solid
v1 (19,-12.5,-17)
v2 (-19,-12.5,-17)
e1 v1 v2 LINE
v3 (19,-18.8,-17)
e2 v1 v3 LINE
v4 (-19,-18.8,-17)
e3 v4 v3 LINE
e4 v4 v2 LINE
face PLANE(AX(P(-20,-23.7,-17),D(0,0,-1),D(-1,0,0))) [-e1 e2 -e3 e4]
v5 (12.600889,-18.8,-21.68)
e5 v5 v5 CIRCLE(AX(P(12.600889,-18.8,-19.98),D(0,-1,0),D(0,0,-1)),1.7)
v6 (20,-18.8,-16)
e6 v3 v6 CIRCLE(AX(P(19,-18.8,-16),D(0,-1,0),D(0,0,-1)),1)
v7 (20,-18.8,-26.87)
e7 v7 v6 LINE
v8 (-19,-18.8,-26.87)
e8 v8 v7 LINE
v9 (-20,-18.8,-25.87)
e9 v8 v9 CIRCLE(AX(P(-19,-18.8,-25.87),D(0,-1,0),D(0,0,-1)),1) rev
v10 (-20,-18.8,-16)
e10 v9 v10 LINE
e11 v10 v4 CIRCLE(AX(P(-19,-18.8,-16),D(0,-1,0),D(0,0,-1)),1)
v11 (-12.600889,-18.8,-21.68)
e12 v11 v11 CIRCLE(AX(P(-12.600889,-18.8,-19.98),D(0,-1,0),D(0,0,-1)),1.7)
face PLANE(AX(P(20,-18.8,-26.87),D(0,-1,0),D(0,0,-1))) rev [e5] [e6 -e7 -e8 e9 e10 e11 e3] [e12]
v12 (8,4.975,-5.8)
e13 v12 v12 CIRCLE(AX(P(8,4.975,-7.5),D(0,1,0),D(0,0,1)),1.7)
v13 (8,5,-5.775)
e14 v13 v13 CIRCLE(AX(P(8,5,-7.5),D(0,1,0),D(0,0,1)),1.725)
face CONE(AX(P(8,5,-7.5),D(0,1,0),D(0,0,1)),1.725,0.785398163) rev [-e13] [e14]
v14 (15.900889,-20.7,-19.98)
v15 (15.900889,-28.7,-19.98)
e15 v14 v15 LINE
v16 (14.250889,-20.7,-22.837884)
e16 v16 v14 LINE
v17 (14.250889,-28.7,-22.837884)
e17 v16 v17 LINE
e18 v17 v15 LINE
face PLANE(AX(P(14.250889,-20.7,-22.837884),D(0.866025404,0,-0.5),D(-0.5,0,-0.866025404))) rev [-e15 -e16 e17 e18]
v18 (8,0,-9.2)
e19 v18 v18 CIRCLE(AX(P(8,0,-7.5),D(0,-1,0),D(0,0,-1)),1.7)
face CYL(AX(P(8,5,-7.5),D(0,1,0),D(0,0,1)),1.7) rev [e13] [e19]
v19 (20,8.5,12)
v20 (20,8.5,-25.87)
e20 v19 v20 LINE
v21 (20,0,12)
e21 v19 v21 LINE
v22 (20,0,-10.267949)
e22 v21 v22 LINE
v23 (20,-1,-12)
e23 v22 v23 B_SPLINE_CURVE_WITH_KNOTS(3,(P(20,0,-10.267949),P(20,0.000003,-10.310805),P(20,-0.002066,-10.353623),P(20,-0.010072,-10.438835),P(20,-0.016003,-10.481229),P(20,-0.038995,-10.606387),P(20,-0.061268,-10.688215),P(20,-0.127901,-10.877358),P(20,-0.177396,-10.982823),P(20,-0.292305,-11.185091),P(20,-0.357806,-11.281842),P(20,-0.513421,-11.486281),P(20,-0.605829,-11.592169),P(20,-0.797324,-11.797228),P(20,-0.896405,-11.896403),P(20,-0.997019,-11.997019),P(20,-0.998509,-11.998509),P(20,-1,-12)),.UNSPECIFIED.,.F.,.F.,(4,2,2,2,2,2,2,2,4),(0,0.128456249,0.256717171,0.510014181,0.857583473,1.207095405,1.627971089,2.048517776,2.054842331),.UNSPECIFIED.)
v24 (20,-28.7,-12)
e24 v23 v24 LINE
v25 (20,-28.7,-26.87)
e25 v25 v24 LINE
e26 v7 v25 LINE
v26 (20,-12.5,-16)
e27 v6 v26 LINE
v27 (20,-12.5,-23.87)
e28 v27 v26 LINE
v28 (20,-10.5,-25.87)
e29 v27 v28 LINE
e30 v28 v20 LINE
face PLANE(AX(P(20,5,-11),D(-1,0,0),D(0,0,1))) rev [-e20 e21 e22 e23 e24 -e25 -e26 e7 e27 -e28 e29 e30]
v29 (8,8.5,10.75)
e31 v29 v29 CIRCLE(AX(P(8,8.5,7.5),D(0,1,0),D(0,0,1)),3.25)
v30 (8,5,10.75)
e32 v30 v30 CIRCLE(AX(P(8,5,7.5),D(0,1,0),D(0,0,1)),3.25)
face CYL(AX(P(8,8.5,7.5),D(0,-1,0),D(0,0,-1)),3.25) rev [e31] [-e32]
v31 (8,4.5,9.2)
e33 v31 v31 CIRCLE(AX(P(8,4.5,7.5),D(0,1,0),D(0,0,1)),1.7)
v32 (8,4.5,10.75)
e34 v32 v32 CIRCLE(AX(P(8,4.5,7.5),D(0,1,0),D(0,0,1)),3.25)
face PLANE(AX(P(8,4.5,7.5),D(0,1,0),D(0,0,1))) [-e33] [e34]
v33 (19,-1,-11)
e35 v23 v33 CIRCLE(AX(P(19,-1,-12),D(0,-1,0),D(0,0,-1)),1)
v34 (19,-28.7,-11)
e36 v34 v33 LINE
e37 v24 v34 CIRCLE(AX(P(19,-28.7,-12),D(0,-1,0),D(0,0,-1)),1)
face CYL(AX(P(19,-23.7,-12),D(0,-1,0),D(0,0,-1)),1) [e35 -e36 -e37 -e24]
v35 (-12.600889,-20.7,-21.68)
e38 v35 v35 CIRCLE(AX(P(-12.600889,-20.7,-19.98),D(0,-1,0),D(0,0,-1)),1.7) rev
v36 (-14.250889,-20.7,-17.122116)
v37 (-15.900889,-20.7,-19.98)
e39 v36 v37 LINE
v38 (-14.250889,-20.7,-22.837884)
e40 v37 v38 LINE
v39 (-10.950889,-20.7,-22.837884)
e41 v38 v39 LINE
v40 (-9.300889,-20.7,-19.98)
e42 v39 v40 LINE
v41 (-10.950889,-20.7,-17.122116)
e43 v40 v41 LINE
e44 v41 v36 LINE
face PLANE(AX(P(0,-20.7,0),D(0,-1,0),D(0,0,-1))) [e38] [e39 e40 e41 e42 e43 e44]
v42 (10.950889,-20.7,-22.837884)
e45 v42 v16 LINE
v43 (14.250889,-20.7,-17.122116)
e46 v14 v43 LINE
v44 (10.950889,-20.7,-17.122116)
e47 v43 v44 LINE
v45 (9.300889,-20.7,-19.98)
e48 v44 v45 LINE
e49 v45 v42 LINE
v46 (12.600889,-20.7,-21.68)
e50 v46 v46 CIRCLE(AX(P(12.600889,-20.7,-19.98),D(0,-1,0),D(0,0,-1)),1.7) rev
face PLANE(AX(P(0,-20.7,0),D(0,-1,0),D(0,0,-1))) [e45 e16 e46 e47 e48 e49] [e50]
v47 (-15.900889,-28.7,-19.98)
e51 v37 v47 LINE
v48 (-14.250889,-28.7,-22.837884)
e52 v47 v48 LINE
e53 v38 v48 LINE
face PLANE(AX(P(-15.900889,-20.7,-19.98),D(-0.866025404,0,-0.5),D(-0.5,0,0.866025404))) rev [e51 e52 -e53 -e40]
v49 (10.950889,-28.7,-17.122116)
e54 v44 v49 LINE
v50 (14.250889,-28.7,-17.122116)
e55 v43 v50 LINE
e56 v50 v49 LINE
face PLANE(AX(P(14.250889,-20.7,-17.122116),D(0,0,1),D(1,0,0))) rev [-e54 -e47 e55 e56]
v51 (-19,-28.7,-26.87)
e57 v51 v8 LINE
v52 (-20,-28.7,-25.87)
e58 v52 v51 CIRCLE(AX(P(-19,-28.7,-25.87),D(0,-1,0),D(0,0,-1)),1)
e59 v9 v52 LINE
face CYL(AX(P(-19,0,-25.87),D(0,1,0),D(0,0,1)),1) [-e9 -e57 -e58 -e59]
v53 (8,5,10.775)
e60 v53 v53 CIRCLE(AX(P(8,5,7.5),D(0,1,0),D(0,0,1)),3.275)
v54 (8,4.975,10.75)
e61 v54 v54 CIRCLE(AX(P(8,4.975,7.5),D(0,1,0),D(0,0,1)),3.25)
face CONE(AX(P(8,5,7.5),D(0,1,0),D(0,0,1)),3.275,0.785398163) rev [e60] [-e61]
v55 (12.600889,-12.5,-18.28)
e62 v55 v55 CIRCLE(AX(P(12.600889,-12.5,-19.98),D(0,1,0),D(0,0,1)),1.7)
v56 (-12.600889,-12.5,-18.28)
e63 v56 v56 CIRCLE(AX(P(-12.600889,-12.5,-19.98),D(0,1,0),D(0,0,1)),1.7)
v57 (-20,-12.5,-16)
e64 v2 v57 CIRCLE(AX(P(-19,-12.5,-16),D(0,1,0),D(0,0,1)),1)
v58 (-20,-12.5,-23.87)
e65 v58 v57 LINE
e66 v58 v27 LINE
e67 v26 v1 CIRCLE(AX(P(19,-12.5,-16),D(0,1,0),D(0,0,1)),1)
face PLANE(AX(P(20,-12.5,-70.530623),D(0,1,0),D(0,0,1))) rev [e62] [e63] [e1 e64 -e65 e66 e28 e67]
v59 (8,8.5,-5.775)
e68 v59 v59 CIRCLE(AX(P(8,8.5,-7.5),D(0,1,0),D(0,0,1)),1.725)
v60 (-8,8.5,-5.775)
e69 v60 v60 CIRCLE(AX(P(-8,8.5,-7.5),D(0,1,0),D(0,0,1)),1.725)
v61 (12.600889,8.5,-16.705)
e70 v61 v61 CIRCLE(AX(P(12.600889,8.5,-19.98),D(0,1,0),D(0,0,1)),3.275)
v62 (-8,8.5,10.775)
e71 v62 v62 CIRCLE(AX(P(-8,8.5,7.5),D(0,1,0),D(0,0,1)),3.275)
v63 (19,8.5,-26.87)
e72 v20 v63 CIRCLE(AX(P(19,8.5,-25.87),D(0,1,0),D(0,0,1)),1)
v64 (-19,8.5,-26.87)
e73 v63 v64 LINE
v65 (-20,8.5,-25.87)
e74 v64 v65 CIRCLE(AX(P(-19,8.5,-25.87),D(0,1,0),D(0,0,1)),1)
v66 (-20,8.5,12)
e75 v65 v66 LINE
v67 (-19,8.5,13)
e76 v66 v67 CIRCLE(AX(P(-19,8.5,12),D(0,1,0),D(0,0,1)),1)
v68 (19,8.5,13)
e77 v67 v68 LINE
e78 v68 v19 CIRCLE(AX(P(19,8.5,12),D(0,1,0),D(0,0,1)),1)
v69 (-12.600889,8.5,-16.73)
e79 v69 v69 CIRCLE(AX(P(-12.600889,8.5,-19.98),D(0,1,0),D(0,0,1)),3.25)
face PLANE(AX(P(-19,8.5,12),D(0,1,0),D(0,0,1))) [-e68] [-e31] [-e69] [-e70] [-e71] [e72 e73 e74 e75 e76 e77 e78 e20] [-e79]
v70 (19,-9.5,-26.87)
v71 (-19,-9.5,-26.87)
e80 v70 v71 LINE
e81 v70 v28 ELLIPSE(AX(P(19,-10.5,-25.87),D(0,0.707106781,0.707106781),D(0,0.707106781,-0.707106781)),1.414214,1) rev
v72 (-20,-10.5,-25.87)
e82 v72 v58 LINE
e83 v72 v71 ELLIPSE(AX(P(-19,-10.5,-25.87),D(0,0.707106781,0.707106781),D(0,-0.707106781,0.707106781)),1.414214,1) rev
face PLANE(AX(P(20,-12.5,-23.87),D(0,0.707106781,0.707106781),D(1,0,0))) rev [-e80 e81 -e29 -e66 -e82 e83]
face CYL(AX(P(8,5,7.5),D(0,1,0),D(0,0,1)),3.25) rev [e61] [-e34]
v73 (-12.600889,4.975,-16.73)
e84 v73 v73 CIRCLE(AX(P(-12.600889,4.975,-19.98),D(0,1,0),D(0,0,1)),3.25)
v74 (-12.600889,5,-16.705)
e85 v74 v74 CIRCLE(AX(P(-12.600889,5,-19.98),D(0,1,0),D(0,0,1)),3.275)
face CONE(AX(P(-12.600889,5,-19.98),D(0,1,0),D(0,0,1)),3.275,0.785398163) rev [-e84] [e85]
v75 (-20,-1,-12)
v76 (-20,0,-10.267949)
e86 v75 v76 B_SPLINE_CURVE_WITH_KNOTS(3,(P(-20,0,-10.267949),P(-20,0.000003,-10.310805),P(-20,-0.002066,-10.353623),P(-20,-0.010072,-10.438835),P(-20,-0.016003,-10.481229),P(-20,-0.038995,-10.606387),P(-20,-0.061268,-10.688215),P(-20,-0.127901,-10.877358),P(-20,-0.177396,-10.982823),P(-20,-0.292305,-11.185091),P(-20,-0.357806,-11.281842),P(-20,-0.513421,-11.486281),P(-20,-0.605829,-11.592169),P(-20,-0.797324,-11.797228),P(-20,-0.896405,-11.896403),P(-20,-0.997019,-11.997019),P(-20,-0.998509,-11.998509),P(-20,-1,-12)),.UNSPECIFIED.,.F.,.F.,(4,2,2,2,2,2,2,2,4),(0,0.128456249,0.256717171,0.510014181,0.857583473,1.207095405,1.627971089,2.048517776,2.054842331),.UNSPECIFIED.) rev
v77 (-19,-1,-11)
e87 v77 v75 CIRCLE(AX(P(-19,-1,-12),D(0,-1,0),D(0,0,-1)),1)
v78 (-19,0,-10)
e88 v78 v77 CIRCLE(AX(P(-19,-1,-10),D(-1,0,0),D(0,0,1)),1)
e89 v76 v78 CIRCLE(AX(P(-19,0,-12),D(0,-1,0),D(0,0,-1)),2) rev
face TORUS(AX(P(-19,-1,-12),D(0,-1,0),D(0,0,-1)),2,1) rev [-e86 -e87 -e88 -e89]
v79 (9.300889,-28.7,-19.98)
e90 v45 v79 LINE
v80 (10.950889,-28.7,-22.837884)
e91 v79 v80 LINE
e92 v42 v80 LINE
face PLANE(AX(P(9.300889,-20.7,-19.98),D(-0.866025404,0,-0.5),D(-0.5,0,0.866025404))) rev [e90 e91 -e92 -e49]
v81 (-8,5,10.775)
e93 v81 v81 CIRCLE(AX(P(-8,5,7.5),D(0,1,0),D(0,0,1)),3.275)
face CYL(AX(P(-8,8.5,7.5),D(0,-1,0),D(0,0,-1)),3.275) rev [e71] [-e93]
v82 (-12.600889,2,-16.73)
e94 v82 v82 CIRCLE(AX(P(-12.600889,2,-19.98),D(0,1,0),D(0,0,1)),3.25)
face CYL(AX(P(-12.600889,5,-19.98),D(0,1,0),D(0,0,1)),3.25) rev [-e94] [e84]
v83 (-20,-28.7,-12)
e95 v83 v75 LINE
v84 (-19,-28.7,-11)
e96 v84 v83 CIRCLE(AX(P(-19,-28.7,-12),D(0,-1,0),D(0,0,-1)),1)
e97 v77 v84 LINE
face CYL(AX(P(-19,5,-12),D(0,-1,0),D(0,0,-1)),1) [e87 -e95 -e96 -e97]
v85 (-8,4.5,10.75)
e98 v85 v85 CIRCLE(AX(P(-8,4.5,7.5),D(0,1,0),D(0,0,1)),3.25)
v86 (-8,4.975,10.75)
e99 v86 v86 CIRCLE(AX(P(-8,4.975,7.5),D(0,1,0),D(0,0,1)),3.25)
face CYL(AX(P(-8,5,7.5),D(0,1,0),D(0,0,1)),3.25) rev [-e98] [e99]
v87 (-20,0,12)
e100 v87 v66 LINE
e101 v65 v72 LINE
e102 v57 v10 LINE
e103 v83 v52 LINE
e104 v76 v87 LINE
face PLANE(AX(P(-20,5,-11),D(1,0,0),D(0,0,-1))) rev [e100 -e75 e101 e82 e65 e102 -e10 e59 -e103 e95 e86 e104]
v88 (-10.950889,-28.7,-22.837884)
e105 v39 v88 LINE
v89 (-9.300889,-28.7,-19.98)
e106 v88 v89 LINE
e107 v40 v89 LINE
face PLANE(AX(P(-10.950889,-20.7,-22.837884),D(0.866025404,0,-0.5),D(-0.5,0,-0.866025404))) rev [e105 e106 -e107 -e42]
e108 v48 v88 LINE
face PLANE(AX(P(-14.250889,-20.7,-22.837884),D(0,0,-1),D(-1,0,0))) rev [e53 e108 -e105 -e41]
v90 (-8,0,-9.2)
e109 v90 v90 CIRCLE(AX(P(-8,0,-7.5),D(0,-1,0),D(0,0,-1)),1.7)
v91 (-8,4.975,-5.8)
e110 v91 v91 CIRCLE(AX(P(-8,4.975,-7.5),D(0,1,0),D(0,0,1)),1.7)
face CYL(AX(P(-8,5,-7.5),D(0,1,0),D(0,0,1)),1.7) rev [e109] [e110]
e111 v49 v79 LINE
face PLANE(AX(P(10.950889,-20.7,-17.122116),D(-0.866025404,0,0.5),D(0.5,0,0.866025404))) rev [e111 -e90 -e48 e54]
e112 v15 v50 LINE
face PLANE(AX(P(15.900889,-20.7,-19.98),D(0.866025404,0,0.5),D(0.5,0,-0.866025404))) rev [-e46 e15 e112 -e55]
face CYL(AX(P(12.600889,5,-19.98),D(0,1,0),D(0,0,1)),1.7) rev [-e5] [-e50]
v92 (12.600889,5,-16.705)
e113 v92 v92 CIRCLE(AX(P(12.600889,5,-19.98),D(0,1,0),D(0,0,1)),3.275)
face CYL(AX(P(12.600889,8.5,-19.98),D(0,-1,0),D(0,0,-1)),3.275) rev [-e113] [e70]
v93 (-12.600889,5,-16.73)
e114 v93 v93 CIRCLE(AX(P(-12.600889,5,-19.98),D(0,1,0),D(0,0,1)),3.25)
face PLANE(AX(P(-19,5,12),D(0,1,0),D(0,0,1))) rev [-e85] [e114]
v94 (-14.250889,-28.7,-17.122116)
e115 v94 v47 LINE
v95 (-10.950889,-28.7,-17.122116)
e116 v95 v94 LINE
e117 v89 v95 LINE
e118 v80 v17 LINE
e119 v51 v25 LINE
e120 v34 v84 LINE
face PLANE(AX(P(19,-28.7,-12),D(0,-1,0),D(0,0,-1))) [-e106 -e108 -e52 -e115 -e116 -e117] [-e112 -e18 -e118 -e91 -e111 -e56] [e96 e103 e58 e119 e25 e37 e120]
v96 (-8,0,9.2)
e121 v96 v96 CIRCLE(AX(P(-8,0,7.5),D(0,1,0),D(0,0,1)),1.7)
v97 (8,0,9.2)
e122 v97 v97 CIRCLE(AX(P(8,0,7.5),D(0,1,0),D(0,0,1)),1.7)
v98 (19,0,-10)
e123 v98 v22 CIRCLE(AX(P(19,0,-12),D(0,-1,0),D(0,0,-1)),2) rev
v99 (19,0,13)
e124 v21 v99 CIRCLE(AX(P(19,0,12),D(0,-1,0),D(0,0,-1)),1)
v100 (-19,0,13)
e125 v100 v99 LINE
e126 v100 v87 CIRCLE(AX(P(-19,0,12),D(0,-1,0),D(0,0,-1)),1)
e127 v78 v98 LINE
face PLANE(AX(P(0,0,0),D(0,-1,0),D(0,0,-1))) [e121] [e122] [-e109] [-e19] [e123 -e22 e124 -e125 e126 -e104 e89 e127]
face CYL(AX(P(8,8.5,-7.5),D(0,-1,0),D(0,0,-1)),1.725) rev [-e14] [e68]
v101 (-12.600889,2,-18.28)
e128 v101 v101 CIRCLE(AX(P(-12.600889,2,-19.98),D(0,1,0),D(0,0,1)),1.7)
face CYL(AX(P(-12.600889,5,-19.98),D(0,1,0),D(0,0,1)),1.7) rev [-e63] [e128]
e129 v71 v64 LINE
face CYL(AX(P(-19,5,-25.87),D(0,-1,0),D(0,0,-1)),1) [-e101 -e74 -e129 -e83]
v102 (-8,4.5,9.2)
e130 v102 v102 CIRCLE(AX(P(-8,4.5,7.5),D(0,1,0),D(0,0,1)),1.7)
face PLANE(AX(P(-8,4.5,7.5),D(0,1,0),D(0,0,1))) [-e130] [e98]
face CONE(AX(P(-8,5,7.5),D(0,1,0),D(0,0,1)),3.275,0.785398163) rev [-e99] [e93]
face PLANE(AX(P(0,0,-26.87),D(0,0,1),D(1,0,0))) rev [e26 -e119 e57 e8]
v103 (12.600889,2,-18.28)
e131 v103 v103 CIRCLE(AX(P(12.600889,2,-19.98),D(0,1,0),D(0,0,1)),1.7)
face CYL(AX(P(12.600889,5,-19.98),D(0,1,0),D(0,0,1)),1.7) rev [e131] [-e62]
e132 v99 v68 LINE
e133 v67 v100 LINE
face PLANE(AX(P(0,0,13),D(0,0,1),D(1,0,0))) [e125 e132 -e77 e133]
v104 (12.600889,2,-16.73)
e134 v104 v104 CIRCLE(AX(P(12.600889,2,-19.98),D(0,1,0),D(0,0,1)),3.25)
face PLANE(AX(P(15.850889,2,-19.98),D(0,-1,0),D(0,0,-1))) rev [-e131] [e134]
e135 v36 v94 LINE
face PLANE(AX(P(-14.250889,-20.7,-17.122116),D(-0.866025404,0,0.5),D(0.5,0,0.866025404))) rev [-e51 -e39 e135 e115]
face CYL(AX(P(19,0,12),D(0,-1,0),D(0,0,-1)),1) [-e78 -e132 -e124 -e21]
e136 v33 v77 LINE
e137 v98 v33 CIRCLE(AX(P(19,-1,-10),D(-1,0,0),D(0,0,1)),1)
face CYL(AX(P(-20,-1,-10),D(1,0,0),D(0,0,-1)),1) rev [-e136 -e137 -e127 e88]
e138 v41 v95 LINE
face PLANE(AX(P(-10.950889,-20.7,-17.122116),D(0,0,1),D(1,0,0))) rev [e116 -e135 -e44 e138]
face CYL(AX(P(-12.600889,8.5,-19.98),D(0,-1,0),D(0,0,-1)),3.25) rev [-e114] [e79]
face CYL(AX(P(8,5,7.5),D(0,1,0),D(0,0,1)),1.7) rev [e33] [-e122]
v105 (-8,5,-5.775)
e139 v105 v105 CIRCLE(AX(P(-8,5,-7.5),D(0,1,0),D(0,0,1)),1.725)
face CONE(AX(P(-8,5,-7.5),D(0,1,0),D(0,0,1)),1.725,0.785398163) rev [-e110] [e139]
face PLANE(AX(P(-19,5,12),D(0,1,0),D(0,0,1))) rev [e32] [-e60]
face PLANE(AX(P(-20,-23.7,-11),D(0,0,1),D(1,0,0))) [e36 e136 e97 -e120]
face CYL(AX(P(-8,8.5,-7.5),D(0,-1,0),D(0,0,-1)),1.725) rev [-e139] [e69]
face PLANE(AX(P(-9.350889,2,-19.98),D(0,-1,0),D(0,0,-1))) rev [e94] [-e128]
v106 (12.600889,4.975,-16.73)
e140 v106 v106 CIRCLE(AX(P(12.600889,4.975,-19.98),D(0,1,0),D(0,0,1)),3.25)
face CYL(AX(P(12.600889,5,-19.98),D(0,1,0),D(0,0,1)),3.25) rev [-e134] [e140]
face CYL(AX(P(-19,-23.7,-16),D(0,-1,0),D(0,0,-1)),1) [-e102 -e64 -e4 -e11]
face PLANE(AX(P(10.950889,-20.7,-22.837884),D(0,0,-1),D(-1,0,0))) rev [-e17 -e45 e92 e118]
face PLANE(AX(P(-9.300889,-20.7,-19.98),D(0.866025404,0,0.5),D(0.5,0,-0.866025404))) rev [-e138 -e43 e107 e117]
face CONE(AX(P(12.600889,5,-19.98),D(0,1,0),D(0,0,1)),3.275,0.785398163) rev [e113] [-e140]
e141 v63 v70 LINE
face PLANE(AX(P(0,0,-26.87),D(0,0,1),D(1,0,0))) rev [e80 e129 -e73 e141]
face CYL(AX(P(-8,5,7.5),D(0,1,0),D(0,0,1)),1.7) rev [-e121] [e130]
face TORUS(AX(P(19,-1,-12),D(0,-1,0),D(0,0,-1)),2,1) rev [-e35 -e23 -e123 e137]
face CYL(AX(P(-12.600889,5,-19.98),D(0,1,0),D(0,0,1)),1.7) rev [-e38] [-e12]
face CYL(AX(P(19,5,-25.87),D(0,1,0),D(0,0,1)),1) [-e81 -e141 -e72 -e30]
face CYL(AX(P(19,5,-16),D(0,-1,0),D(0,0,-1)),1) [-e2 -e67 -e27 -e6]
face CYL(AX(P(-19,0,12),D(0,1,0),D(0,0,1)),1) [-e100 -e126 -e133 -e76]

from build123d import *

# Parameters (mm, degrees)
SKETCH1_W                      = 40
SKETCH1_H                      = 22
BOSS_EXTRUDE1_DEPTH            = 5
CBORE_FOR_M3_SHCS1_AT_2_COUNT  = 2
CBORE_FOR_M3_SHCS1_AT_2_PITCH  = 16
SKETCH6_W                      = 40
SKETCH6_H                      = 6
BOSS_EXTRUDE2_DEPTH            = 28.7
SKETCH7_W                      = 40
SKETCH7_H                      = 4.9
BOSS_EXTRUDE3_DEPTH            = 9.87
SKETCH8_W                      = 40
SKETCH8_H                      = 17.5
BOSS_EXTRUDE4_DEPTH            = 9.87
SKETCH18_W                     = 40
SKETCH18_H                     = 5
BOSS_EXTRUDE7_DEPTH            = 2
CBORE_FOR_M3_SHCS2_AT_2_COUNT  = 2
CBORE_FOR_M3_SHCS2_AT_2_PITCH  = 25.201777654
CHAMFER1_SIZE                  = 3
FILLET2_R                      = 1
M3_CLEARANCE_HOLE1_D           = 3.4
M3_CLEARANCE_HOLE1_CSINK_D     = 3.45
M3_CLEARANCE_HOLE1_CSINK_ANGLE = 90
FILLET3_R                      = 1
CUT_EXTRUDE1_DEPTH             = 3
BOSS_EXTRUDE6_START            = 5
BOSS_EXTRUDE6_DEPTH            = 5
BOSS_EXTRUDE8_START            = 3.5
SKETCH19_R                     = 3.275
SKETCH19_R_2                   = 3.25
SKETCH19_R_3                   = 1.725
BOSS_EXTRUDE8_DEPTH            = 3.5
BOSS_EXTRUDE9_START            = 2.5
SKETCH20_R                     = 3.25
SKETCH20_R_2                   = 1.7
BOSS_EXTRUDE9_DEPTH            = 2.5


with BuildPart() as part:
    # Sketch1 → Boss-Extrude1 (new body)
    with BuildSketch(Plane(origin=(0, 0, 0), x_dir=(1, 0, 0), z_dir=(0, 1, 0))):
        Rectangle(SKETCH1_W, SKETCH1_H)
    extrude(amount=BOSS_EXTRUDE1_DEPTH)

    # Sketch4 → CBORE for M3 SHCS1 (revolve, cut)
    with BuildSketch(Plane(origin=(8, 5, 7.5), x_dir=(0, 0, 1), z_dir=(1, 0, 0))):
        Polygon((0, 0), (0, 5), (1.7, 5), (1.7, 3), (3.25, 3), (3.25, 0.025), (3.275, 0), align=None)
    cbore_for_m3_shcs1 = revolve(axis=Axis((8, 11.35, 7.5), (0, -1, 0)), mode=Mode.SUBTRACT)

    # CBORE for M3 SHCS1 at 2: CBORE for M3 SHCS1 ×2
    with Locations(*[(-i * CBORE_FOR_M3_SHCS1_AT_2_PITCH, 0, 0) for i in range(1, CBORE_FOR_M3_SHCS1_AT_2_COUNT)]):
        add(cbore_for_m3_shcs1, mode=Mode.SUBTRACT)

    # Sketch6 → Boss-Extrude2 (add)
    with BuildSketch(Plane(origin=(0, 5, 0), x_dir=(1, 0, 0), z_dir=(0, 1, 0))):
        with Locations((0, 14)):
            Rectangle(SKETCH6_W, SKETCH6_H)
    extrude(amount=-BOSS_EXTRUDE2_DEPTH)

    # Sketch7 → Boss-Extrude3 (add)
    with BuildSketch(Plane(origin=(0, 0, -17), x_dir=(-1, 0, 0), z_dir=(0, 0, -1))):
        with Locations((0, -21.25)):
            Rectangle(SKETCH7_W, SKETCH7_H)
    extrude(amount=BOSS_EXTRUDE3_DEPTH)

    # Sketch8 → Boss-Extrude4 (add)
    with BuildSketch(Plane(origin=(0, 0, -17), x_dir=(-1, 0, 0), z_dir=(0, 0, -1))):
        with Locations((0, -3.75)):
            Rectangle(SKETCH8_W, SKETCH8_H)
    extrude(amount=BOSS_EXTRUDE4_DEPTH)

    # Sketch18 → Boss-Extrude7 (add)
    with BuildSketch(Plane.XY.offset(11)):
        with Locations((0, 2.5)):
            Rectangle(SKETCH18_W, SKETCH18_H)
    extrude(amount=BOSS_EXTRUDE7_DEPTH)

    # Sketch11 → CBORE for M3 SHCS2 (revolve, cut)
    with BuildSketch(Plane(origin=(-12.600888827, 5, -19.98), x_dir=(0, 0, 1), z_dir=(1, 0, 0))):
        Polygon((0, 0), (0, 28.7), (1.7, 28.7), (1.7, 3), (3.25, 3), (3.25, 0.025), (3.275, 0), align=None)
    cbore_for_m3_shcs2 = revolve(axis=Axis((-12.600888827, 11.35, -19.98), (0, -1, 0)), mode=Mode.SUBTRACT)

    # CBORE for M3 SHCS2 at 2: CBORE for M3 SHCS2 ×2
    with Locations(*[(i * CBORE_FOR_M3_SHCS2_AT_2_PITCH, 0, 0) for i in range(1, CBORE_FOR_M3_SHCS2_AT_2_COUNT)]):
        add(cbore_for_m3_shcs2, mode=Mode.SUBTRACT)

    # Chamfer1
    chamfer1_edges = [part.edges().sort_by_distance(p)[0] for p in [
        (0, -12.5, -26.87),
    ]]
    chamfer(chamfer1_edges, length=CHAMFER1_SIZE)

    # Fillet2
    fillet2_edges = [part.edges().sort_by_distance(p)[0] for p in [
        (20, -2.25, -26.87),
        (-20, -11.85, -11),
        (20, -11.85, -11),
        (20, -15.65, -17),
        (-20, -15.65, -17),
        (-20, -21.25, -26.87),
        (-20, -2.25, -26.87),
        (-20, 2.5, 13),
        (20, 2.5, 13),
    ]]
    fillet(fillet2_edges, radius=FILLET2_R)

    # M3 Clearance Hole1 (through all)
    with Locations(Plane(origin=(0, 5, 0), x_dir=(1, 0, 0), z_dir=(0, 1, 0))):
        with Locations((-8, 7.5), (8, 7.5)):
            CounterSinkHole(M3_CLEARANCE_HOLE1_D / 2, M3_CLEARANCE_HOLE1_CSINK_D / 2, counter_sink_angle=M3_CLEARANCE_HOLE1_CSINK_ANGLE)

    # Fillet3
    # the kernel refuses this fillet: 1 mm, written as the material it adds along each edge
    with BuildSketch(Plane(origin=(19, 0, -11), x_dir=(0, -1, 0), z_dir=(-1, 0, 0))) as fillet3_piece_1:
        with BuildLine():
            CenterArc((FILLET3_R, FILLET3_R), FILLET3_R, 180, 90)
            Line((0, FILLET3_R), (0, 0))
            Line((0, 0), (FILLET3_R, 0))
        make_face()
    extrude(amount=38)
    with BuildSketch(Plane(origin=(-19, 0, -12), x_dir=(0, 0, 1), z_dir=(1, 0, 0))) as fillet3_piece_2_section:
        with BuildLine():
            CenterArc((1 + FILLET3_R, FILLET3_R), FILLET3_R, 180, 90)
            Line((1 + FILLET3_R, 0), (1, 0))
            Line((1, 0), (1, FILLET3_R))
        make_face()
    fillet3_piece_2 = revolve(axis=Axis((-19, 0, -12), (0, -1, 0)), revolution_arc=233.296989237, mode=Mode.PRIVATE)
    fillet3_piece_2 = split(fillet3_piece_2, bisect_by=Plane(origin=(-20, -0.311628018, -11.250060985), z_dir=(1, 0, 0)), keep=Keep.TOP, mode=Mode.PRIVATE)
    add(fillet3_piece_2)
    with BuildSketch(Plane(origin=(19, 0, -12), x_dir=(-0.8017442392976477, 0, -0.5976672776328282), z_dir=(-0.5976672776328282, 0, 0.8017442392976477))) as fillet3_piece_3_section:
        with BuildLine():
            CenterArc((1 + FILLET3_R, FILLET3_R), FILLET3_R, 180, 90)
            Line((1, FILLET3_R), (1, 0))
            Line((1, 0), (1 + FILLET3_R, 0))
        make_face()
    fillet3_piece_3 = revolve(axis=Axis((19, 0, -12), (0, -1, 0)), revolution_arc=233.296989237, mode=Mode.PRIVATE)
    fillet3_piece_3 = split(fillet3_piece_3, bisect_by=Plane(origin=(20, -0.31162852, -11.250061149), z_dir=(-1, 0, 0)), keep=Keep.TOP, mode=Mode.PRIVATE)
    add(fillet3_piece_3)

    # Sketch15 → Cut-Extrude1 (cut)
    with BuildSketch(Plane.XZ.offset(23.7)):
        Polygon((15.900888827, -19.98), (14.250888827, -17.122116168), (10.950888827, -17.122116168), (9.300888827, -19.98), (10.950888827, -22.837883832), (14.250888827, -22.837883832), align=None)
        Polygon((-9.300888827, -19.98), (-10.950888827, -17.122116168), (-14.250888827, -17.122116168), (-15.900888827, -19.98), (-14.250888827, -22.837883832), (-10.950888827, -22.837883832), align=None)
    extrude(amount=-CUT_EXTRUDE1_DEPTH, mode=Mode.SUBTRACT)

    # Sketch16 → Boss-Extrude6 (add)
    with BuildSketch(Plane.XZ.offset(23.7).offset(BOSS_EXTRUDE6_START)):
        with BuildLine():
            Line((19, -11), (-19, -11))
            ThreePointArc((-19, -11), (-19.707106781, -11.292893219), (-20, -12))
            Line((-20, -12), (-20, -25.87))
            ThreePointArc((-20, -25.87), (-19.707106781, -26.577106781), (-19, -26.87))
            Line((-19, -26.87), (20, -26.87))
            Line((20, -26.87), (20, -12))
            ThreePointArc((20, -12), (19.707106781, -11.292893219), (19, -11))
        make_face()
        Polygon((10.950888827, -22.837883832), (14.250888827, -22.837883832), (15.900888827, -19.98), (14.250888827, -17.122116168), (10.950888827, -17.122116168), (9.300888827, -19.98), align=None, mode=Mode.SUBTRACT)
        Polygon((-10.950888827, -22.837883832), (-9.300888827, -19.98), (-10.950888827, -17.122116168), (-14.250888827, -17.122116168), (-15.900888827, -19.98), (-14.250888827, -22.837883832), align=None, mode=Mode.SUBTRACT)
    extrude(amount=-BOSS_EXTRUDE6_DEPTH)

    # Sketch19 → Boss-Extrude8 (add)
    with BuildSketch(Plane(origin=(0, 5, 0), x_dir=(1, 0, 0), z_dir=(0, 1, 0)).offset(BOSS_EXTRUDE8_START)):
        with BuildLine():
            Line((-19, -13), (19, -13))
            ThreePointArc((19, -13), (19.707106781, -12.707106781), (20, -12))
            Line((20, -12), (20, 25.87))
            ThreePointArc((20, 25.87), (19.707106781, 26.577106781), (19, 26.87))
            Line((19, 26.87), (-19, 26.87))
            ThreePointArc((-19, 26.87), (-19.707106781, 26.577106781), (-20, 25.87))
            Line((-20, 25.87), (-20, -12))
            ThreePointArc((-20, -12), (-19.707106781, -12.707106781), (-19, -13))
        make_face()
        with Locations(Location((-8, -7.5, 0), (0, 0, 270))):
            Circle(SKETCH19_R, mode=Mode.SUBTRACT)
        with Locations(Location((8, -7.5, 0), (0, 0, 270))):
            Circle(SKETCH19_R_2, mode=Mode.SUBTRACT)
        with Locations(Location((8, 7.5, 0), (0, 0, 270))):
            Circle(SKETCH19_R_3, mode=Mode.SUBTRACT)
        with Locations(Location((-8, 7.5, 0), (0, 0, 270))):
            Circle(SKETCH19_R_3, mode=Mode.SUBTRACT)
        with Locations(Location((-12.600888827, 19.98, 0), (0, 0, 270))):
            Circle(SKETCH19_R_2, mode=Mode.SUBTRACT)
        with Locations(Location((12.600888827, 19.98, 0), (0, 0, 270))):
            Circle(SKETCH19_R, mode=Mode.SUBTRACT)
    extrude(amount=-BOSS_EXTRUDE8_DEPTH)

    # Sketch20 → Boss-Extrude9 (add)
    # profile 1 of 2: a face of its own
    with BuildSketch(Plane(origin=(0, 2, 0), x_dir=(1, 0, 0), z_dir=(0, 1, 0)).offset(BOSS_EXTRUDE9_START)):
        with Locations(Location((-8, -7.5, 0), (0, 0, 270))):
            Circle(SKETCH20_R)
        with Locations(Location((-8, -7.5, 0), (0, 0, 270))):
            Circle(SKETCH20_R_2, mode=Mode.SUBTRACT)
    # profile 2 of 2: a face of its own
    with BuildSketch(Plane(origin=(0, 2, 0), x_dir=(1, 0, 0), z_dir=(0, 1, 0)).offset(BOSS_EXTRUDE9_START)):
        with Locations(Location((8, -7.5, 0), (0, 0, 270))):
            Circle(SKETCH20_R)
        with Locations(Location((8, -7.5, 0), (0, 0, 270))):
            Circle(SKETCH20_R_2, mode=Mode.SUBTRACT)
    extrude(amount=-BOSS_EXTRUDE9_DEPTH)


solid = part.part
